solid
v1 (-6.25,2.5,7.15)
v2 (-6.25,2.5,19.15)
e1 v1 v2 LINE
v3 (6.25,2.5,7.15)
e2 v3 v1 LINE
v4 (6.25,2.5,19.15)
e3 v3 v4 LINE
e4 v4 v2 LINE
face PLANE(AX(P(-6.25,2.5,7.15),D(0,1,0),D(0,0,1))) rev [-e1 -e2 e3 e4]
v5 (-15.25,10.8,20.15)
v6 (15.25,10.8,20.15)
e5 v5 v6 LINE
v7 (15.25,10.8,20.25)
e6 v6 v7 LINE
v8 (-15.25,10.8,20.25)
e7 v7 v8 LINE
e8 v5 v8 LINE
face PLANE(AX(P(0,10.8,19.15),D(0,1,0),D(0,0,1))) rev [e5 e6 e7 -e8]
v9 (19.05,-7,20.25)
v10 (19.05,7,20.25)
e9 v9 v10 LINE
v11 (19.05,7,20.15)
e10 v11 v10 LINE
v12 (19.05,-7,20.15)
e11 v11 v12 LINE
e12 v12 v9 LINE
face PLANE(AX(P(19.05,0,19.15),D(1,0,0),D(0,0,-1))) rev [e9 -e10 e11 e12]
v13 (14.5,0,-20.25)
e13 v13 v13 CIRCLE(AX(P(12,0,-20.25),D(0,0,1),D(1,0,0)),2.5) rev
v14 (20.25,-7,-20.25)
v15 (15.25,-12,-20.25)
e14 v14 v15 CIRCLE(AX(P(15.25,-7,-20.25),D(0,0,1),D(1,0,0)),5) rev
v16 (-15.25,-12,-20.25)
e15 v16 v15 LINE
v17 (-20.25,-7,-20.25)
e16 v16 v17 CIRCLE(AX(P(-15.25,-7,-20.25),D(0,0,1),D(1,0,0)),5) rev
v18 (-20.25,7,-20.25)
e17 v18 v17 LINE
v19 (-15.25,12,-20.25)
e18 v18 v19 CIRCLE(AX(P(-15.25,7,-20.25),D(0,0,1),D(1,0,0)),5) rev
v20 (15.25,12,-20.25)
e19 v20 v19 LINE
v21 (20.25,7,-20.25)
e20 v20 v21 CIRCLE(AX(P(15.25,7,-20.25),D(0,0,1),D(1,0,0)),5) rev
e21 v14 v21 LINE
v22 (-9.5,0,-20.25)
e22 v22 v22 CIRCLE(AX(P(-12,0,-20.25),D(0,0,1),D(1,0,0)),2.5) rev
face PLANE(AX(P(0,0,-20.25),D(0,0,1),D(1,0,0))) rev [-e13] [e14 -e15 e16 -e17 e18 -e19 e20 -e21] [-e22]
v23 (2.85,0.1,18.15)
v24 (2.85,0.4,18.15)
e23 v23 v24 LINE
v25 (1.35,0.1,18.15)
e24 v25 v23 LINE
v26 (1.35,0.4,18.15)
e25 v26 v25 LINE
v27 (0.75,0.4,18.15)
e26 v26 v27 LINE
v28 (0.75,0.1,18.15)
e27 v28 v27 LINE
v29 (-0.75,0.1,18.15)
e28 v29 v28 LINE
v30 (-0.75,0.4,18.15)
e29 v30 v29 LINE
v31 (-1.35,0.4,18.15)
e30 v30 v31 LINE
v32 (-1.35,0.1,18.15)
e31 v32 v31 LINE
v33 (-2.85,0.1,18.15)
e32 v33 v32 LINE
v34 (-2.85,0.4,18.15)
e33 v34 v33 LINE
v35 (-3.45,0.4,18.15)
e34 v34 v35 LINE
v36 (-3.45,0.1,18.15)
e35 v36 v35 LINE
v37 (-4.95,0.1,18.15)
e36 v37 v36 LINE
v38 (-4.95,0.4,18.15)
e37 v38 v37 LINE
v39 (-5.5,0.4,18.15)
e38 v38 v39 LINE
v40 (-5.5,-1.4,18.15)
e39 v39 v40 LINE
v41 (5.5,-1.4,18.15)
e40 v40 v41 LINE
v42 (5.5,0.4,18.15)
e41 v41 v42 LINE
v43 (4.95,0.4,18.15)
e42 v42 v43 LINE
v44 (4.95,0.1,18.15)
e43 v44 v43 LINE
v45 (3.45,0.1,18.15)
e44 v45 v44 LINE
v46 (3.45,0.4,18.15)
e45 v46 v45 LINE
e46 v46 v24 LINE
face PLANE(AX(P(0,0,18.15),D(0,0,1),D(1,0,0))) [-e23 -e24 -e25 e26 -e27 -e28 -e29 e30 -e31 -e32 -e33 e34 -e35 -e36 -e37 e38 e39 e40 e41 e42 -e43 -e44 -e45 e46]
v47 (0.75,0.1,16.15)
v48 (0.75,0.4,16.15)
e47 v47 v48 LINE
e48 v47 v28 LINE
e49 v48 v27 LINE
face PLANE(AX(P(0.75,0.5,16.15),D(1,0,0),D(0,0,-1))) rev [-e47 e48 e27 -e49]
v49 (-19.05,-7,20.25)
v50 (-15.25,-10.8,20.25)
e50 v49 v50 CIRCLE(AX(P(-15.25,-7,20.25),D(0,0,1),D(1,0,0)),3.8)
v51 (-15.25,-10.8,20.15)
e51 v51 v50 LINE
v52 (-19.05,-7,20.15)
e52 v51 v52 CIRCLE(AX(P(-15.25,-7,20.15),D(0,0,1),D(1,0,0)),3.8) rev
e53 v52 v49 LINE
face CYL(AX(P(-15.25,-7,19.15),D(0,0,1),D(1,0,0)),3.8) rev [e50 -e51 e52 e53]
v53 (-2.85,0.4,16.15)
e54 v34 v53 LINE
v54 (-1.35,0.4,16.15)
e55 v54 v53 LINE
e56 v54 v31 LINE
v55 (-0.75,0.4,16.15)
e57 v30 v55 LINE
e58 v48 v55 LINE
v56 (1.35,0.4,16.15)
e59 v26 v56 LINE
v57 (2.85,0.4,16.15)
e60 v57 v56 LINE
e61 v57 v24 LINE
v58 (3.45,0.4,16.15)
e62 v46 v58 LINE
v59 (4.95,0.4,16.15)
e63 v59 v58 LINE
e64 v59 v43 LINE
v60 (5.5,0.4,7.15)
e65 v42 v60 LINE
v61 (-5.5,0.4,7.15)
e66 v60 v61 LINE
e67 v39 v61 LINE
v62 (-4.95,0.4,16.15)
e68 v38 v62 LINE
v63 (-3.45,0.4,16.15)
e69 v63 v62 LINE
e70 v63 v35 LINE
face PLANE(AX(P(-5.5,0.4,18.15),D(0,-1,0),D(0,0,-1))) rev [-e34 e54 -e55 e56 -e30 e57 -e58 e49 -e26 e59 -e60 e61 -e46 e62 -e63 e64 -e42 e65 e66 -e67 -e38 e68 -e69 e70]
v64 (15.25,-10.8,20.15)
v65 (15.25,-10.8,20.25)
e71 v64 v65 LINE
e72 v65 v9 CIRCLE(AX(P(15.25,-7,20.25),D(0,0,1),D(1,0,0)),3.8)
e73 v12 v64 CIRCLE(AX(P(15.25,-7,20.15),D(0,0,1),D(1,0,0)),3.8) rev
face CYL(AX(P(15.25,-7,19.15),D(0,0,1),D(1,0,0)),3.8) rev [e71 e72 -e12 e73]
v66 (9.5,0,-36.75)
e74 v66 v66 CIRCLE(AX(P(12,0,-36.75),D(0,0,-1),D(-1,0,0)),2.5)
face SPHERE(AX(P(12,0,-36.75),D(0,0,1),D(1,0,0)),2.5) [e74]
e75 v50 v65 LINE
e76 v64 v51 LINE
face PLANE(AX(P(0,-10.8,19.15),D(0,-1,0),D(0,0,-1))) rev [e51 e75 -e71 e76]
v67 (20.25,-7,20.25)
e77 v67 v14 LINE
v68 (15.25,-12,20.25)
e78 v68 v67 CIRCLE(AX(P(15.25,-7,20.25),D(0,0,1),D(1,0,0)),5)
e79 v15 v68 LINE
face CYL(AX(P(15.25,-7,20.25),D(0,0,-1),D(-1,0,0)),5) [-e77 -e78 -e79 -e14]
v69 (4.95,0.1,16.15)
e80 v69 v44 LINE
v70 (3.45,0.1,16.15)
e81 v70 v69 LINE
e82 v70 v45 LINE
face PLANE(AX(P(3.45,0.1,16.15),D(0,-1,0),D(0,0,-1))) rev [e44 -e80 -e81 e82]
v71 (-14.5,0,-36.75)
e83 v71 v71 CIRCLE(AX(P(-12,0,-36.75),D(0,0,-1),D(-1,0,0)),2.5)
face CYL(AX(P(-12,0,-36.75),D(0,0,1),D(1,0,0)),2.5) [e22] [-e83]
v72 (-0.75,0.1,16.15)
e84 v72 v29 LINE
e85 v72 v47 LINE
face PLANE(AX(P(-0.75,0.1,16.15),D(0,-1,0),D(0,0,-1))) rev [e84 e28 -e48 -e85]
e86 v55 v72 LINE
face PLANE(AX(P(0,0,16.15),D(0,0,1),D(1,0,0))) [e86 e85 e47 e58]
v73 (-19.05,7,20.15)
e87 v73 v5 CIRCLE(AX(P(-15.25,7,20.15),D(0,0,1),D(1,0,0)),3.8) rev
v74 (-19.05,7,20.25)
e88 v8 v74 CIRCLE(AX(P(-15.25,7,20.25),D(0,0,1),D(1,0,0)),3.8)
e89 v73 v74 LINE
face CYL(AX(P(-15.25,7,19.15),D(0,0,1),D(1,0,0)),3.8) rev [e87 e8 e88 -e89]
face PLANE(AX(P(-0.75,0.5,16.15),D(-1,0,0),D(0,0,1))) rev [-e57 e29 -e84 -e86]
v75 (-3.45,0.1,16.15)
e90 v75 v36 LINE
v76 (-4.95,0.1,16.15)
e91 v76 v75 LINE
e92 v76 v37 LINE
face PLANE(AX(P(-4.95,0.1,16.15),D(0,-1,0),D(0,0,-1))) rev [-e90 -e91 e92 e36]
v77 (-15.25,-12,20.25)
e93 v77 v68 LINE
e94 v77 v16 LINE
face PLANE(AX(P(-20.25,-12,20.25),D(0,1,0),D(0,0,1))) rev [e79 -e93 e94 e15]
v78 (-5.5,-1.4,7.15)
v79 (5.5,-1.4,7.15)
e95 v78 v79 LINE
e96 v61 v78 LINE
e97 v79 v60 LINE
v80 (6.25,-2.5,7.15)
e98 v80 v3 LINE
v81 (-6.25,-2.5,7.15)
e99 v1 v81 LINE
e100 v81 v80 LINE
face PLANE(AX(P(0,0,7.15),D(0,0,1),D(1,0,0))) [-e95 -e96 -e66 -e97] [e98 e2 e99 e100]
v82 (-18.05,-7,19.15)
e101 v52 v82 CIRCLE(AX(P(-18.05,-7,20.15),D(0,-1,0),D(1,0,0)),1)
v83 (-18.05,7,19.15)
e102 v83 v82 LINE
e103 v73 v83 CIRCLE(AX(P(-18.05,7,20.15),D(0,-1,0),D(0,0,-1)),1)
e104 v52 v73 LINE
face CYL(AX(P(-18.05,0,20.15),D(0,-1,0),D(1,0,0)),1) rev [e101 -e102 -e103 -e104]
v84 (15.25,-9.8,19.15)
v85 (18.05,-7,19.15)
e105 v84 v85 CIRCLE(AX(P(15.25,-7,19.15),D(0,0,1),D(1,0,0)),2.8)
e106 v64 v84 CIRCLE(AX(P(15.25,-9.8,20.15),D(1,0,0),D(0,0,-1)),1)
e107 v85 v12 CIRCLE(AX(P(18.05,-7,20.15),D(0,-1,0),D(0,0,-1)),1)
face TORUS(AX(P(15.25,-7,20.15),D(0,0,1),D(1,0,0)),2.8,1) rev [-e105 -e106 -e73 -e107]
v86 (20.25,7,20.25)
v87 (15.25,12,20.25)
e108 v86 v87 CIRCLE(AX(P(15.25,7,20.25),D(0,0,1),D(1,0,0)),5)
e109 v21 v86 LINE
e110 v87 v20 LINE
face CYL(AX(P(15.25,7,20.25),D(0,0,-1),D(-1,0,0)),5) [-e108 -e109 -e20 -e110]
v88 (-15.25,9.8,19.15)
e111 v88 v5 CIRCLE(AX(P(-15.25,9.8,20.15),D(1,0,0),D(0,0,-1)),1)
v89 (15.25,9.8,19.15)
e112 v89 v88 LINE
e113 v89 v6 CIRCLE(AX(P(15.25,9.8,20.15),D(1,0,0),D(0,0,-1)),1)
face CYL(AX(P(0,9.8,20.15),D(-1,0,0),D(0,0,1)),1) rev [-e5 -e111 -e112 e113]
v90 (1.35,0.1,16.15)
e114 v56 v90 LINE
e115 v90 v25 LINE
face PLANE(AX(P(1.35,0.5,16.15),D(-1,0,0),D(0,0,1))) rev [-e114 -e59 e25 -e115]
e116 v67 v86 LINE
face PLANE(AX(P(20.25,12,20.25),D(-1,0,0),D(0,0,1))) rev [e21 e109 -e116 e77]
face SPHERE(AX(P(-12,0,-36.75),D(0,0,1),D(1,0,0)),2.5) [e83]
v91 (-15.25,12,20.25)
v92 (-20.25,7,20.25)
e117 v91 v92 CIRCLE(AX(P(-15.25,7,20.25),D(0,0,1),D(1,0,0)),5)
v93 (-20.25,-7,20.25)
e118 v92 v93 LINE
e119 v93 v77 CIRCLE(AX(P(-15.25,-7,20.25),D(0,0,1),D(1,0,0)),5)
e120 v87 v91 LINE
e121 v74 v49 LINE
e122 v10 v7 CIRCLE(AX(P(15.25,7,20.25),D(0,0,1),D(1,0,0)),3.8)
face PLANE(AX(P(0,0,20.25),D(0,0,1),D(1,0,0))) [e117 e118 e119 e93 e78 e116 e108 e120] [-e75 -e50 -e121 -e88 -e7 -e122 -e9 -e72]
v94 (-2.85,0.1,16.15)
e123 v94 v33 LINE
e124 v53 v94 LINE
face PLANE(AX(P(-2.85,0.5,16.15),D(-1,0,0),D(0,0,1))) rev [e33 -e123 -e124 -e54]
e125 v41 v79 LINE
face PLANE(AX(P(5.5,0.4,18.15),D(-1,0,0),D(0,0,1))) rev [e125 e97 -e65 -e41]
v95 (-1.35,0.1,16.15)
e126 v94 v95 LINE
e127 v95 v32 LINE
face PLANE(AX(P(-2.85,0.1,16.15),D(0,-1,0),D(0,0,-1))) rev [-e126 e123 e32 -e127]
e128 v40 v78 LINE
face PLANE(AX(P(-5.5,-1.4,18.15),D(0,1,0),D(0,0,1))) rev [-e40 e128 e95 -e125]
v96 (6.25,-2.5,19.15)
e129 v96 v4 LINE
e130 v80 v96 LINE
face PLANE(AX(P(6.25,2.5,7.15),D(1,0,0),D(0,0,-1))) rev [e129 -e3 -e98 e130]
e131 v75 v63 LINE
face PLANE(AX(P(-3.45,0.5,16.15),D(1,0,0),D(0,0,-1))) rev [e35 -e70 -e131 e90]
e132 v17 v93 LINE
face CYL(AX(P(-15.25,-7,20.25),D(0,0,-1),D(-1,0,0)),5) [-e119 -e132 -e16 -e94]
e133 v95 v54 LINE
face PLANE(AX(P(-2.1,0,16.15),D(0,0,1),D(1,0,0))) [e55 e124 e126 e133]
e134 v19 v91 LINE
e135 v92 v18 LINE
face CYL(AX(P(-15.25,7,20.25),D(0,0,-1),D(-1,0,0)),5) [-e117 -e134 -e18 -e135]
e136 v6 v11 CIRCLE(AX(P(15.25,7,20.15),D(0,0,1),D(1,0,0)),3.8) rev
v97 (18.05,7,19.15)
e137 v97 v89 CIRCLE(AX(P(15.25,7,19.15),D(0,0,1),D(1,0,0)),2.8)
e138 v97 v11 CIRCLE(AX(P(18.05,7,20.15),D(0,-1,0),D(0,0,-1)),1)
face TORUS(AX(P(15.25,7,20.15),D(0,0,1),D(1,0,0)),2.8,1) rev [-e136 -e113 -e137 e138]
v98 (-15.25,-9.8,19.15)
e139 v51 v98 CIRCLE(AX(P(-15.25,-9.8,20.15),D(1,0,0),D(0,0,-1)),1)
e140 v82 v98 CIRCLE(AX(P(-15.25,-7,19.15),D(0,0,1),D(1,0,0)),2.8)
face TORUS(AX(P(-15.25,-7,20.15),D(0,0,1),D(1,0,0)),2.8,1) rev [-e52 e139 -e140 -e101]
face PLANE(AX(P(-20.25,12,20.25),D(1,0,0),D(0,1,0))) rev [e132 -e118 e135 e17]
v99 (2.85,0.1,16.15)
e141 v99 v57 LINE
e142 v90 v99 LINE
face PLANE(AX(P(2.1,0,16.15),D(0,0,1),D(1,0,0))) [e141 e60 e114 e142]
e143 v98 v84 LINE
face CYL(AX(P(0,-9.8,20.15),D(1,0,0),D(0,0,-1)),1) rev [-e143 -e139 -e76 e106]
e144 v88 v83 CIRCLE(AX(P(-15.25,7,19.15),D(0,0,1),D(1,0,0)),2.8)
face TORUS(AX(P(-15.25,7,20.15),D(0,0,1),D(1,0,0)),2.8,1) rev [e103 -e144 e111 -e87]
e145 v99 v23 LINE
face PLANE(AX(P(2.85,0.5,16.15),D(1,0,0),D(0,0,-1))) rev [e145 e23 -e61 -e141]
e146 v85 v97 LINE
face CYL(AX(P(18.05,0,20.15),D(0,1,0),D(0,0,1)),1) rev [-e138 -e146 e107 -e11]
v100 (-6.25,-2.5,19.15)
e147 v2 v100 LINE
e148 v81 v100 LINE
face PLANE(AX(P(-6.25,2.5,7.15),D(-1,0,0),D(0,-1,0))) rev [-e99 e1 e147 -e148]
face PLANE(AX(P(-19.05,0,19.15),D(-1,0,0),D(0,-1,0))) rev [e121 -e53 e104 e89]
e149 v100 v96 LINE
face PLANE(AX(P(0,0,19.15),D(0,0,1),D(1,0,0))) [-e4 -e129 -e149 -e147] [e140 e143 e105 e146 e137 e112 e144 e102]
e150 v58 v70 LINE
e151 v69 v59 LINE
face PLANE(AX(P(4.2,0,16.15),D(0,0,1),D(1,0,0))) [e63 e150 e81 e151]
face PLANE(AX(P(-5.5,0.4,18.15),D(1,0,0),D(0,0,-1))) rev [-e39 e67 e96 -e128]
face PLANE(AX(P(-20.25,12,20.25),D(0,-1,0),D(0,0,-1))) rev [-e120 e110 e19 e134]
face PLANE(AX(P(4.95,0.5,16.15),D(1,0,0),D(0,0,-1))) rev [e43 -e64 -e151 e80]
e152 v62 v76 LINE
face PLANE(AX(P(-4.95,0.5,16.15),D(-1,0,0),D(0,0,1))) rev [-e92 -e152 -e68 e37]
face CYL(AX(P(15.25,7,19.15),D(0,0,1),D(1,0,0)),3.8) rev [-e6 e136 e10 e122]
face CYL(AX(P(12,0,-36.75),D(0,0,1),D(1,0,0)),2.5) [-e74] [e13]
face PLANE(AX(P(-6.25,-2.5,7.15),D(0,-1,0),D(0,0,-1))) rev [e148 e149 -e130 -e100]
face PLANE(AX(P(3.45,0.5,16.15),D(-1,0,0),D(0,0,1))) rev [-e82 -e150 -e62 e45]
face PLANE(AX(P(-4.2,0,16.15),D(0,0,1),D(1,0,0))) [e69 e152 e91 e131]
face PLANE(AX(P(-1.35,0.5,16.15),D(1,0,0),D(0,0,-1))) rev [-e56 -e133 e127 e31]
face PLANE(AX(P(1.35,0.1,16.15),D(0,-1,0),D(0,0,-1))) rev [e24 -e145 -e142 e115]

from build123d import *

# Parameters (mm, degrees)
SKETCH1_W           = 40.5
SKETCH1_H           = 24
BOSS_EXTRUDE1_DEPTH = 20.25
FILLET1_R           = 5
CUT_EXTRUDE7_DEPTH  = 1.1
FILLET2_R           = 1
SKETCH14_R          = 2.5
BOSS_EXTRUDE3_DEPTH = 16.5
SKETCH15_W          = 12.5
SKETCH15_H          = 5
CUT_EXTRUDE8_DEPTH  = 12
SKETCH17_W          = 11
SKETCH17_H          = 1.8
BOSS_EXTRUDE4_DEPTH = 11
SKETCH18_W          = 1.5
SKETCH18_H          = 0.4
CUT_EXTRUDE9_DEPTH  = 2
LPATTERN1_COUNT     = 3
LPATTERN1_PITCH     = 2.1
LPATTERN1_COL_COUNT = 3
LPATTERN1_COL_PITCH = 2.1


# Read off the part's stored shape, not the designer's step: Dome1, Dome2
with BuildPart() as part:
    # Sketch1 → Boss-Extrude1 (new, symmetric)
    with BuildSketch(Plane.XY):
        Rectangle(SKETCH1_W, SKETCH1_H)
    extrude(amount=BOSS_EXTRUDE1_DEPTH, both=True)

    # Fillet1
    fillet1_edges = [part.edges().sort_by_distance(p)[0] for p in [
        (20.25, -12, 0),
        (-20.25, -12, 0),
        (-20.25, 12, 0),
        (20.25, 12, 0),
    ]]
    fillet(fillet1_edges, radius=FILLET1_R)

    # Sketch13 → Cut-Extrude7 (cut)
    with BuildSketch(Plane.XY.offset(20.25)):
        with BuildLine():
            Line((-19.05, 7), (-19.05, -7))
            ThreePointArc((-19.05, -7), (-17.937005769, -9.687005769), (-15.25, -10.8))
            Line((-15.25, -10.8), (15.25, -10.8))
            ThreePointArc((15.25, -10.8), (17.937005769, -9.687005769), (19.05, -7))
            Line((19.05, -7), (19.05, 7))
            ThreePointArc((19.05, 7), (17.937005769, 9.687005769), (15.25, 10.8))
            Line((15.25, 10.8), (-15.25, 10.8))
            ThreePointArc((-15.25, 10.8), (-17.937005769, 9.687005769), (-19.05, 7))
        make_face()
    extrude(amount=-CUT_EXTRUDE7_DEPTH, mode=Mode.SUBTRACT)

    # Fillet2
    fillet2_edges = [part.edges().sort_by_distance(p)[0] for p in [
        (-19.05, 0, 19.15),
        (-17.937005769, 9.687005769, 19.15),
        (0, 10.8, 19.15),
        (17.937005769, 9.687005769, 19.15),
        (19.05, 0, 19.15),
        (17.937005769, -9.687005769, 19.15),
        (0, -10.8, 19.15),
        (-17.937005769, -9.687005769, 19.15),
    ]]
    fillet(fillet2_edges, radius=FILLET2_R)

    # Sketch14 → Boss-Extrude3 (add)
    with BuildSketch(Plane(origin=(0, 0, -20.25), x_dir=(-1, 0, 0), z_dir=(0, 0, -1))):
        with Locations(Location((-12, 0, 0), (0, 0, 180))):
            Circle(SKETCH14_R)
        with Locations(Location((12, 0, 0), (0, 0, 180))):
            Circle(SKETCH14_R)
    extrude(amount=BOSS_EXTRUDE3_DEPTH)

    # Dome1 outline → Dome1 (revolve)
    with BuildSketch(Plane(origin=(12, 0, 0), x_dir=(1, 0, 0), z_dir=(0, -1, 0))):
        with BuildLine():
            Line((0, -36.749999997), (0, -39.25))
            ThreePointArc((0, -39.25), (1.767766954, -38.517766952), (2.5, -36.749999997))
            Line((2.5, -36.749999997), (0, -36.749999997))
        make_face()
    revolve(axis=Axis((12, 0, 0), (0, 0, 1)))

    # Dome2 outline → Dome2 (revolve)
    with BuildSketch(Plane(origin=(-12, 0, 0), x_dir=(1, 0, 0), z_dir=(0, -1, 0))):
        with BuildLine():
            Line((0, -36.749999997), (0, -39.25))
            ThreePointArc((0, -39.25), (1.767766954, -38.517766952), (2.5, -36.749999997))
            Line((2.5, -36.749999997), (0, -36.749999997))
        make_face()
    revolve(axis=Axis((-12, 0, 0), (0, 0, 1)))

    # Sketch15 → Cut-Extrude8 (cut)
    with BuildSketch(Plane.XY.offset(19.15)):
        Rectangle(SKETCH15_W, SKETCH15_H)
    extrude(amount=-CUT_EXTRUDE8_DEPTH, mode=Mode.SUBTRACT)

    # Sketch17 → Boss-Extrude4 (add)
    with BuildSketch(Plane.XY.offset(7.15)):
        with Locations((0, -0.5)):
            Rectangle(SKETCH17_W, SKETCH17_H)
    extrude(amount=BOSS_EXTRUDE4_DEPTH)

    # Sketch18 → Cut-Extrude9 (cut)
    with BuildSketch(Plane.XY.offset(18.15)):
        with Locations((0, 0.3)):
            Rectangle(SKETCH18_W, SKETCH18_H)
    cut_extrude9 = extrude(amount=-CUT_EXTRUDE9_DEPTH, mode=Mode.SUBTRACT)

    # LPattern1: Cut-Extrude9 ×3
    with Locations(*[(i * LPATTERN1_PITCH, 0, 0) for i in range(1, LPATTERN1_COUNT)]):
        add(cut_extrude9, mode=Mode.SUBTRACT)

    # LPattern1 col: Cut-Extrude9 ×3
    with Locations(*[(-i * LPATTERN1_COL_PITCH, 0, 0) for i in range(1, LPATTERN1_COL_COUNT)]):
        add(cut_extrude9, mode=Mode.SUBTRACT)


solid = part.part
